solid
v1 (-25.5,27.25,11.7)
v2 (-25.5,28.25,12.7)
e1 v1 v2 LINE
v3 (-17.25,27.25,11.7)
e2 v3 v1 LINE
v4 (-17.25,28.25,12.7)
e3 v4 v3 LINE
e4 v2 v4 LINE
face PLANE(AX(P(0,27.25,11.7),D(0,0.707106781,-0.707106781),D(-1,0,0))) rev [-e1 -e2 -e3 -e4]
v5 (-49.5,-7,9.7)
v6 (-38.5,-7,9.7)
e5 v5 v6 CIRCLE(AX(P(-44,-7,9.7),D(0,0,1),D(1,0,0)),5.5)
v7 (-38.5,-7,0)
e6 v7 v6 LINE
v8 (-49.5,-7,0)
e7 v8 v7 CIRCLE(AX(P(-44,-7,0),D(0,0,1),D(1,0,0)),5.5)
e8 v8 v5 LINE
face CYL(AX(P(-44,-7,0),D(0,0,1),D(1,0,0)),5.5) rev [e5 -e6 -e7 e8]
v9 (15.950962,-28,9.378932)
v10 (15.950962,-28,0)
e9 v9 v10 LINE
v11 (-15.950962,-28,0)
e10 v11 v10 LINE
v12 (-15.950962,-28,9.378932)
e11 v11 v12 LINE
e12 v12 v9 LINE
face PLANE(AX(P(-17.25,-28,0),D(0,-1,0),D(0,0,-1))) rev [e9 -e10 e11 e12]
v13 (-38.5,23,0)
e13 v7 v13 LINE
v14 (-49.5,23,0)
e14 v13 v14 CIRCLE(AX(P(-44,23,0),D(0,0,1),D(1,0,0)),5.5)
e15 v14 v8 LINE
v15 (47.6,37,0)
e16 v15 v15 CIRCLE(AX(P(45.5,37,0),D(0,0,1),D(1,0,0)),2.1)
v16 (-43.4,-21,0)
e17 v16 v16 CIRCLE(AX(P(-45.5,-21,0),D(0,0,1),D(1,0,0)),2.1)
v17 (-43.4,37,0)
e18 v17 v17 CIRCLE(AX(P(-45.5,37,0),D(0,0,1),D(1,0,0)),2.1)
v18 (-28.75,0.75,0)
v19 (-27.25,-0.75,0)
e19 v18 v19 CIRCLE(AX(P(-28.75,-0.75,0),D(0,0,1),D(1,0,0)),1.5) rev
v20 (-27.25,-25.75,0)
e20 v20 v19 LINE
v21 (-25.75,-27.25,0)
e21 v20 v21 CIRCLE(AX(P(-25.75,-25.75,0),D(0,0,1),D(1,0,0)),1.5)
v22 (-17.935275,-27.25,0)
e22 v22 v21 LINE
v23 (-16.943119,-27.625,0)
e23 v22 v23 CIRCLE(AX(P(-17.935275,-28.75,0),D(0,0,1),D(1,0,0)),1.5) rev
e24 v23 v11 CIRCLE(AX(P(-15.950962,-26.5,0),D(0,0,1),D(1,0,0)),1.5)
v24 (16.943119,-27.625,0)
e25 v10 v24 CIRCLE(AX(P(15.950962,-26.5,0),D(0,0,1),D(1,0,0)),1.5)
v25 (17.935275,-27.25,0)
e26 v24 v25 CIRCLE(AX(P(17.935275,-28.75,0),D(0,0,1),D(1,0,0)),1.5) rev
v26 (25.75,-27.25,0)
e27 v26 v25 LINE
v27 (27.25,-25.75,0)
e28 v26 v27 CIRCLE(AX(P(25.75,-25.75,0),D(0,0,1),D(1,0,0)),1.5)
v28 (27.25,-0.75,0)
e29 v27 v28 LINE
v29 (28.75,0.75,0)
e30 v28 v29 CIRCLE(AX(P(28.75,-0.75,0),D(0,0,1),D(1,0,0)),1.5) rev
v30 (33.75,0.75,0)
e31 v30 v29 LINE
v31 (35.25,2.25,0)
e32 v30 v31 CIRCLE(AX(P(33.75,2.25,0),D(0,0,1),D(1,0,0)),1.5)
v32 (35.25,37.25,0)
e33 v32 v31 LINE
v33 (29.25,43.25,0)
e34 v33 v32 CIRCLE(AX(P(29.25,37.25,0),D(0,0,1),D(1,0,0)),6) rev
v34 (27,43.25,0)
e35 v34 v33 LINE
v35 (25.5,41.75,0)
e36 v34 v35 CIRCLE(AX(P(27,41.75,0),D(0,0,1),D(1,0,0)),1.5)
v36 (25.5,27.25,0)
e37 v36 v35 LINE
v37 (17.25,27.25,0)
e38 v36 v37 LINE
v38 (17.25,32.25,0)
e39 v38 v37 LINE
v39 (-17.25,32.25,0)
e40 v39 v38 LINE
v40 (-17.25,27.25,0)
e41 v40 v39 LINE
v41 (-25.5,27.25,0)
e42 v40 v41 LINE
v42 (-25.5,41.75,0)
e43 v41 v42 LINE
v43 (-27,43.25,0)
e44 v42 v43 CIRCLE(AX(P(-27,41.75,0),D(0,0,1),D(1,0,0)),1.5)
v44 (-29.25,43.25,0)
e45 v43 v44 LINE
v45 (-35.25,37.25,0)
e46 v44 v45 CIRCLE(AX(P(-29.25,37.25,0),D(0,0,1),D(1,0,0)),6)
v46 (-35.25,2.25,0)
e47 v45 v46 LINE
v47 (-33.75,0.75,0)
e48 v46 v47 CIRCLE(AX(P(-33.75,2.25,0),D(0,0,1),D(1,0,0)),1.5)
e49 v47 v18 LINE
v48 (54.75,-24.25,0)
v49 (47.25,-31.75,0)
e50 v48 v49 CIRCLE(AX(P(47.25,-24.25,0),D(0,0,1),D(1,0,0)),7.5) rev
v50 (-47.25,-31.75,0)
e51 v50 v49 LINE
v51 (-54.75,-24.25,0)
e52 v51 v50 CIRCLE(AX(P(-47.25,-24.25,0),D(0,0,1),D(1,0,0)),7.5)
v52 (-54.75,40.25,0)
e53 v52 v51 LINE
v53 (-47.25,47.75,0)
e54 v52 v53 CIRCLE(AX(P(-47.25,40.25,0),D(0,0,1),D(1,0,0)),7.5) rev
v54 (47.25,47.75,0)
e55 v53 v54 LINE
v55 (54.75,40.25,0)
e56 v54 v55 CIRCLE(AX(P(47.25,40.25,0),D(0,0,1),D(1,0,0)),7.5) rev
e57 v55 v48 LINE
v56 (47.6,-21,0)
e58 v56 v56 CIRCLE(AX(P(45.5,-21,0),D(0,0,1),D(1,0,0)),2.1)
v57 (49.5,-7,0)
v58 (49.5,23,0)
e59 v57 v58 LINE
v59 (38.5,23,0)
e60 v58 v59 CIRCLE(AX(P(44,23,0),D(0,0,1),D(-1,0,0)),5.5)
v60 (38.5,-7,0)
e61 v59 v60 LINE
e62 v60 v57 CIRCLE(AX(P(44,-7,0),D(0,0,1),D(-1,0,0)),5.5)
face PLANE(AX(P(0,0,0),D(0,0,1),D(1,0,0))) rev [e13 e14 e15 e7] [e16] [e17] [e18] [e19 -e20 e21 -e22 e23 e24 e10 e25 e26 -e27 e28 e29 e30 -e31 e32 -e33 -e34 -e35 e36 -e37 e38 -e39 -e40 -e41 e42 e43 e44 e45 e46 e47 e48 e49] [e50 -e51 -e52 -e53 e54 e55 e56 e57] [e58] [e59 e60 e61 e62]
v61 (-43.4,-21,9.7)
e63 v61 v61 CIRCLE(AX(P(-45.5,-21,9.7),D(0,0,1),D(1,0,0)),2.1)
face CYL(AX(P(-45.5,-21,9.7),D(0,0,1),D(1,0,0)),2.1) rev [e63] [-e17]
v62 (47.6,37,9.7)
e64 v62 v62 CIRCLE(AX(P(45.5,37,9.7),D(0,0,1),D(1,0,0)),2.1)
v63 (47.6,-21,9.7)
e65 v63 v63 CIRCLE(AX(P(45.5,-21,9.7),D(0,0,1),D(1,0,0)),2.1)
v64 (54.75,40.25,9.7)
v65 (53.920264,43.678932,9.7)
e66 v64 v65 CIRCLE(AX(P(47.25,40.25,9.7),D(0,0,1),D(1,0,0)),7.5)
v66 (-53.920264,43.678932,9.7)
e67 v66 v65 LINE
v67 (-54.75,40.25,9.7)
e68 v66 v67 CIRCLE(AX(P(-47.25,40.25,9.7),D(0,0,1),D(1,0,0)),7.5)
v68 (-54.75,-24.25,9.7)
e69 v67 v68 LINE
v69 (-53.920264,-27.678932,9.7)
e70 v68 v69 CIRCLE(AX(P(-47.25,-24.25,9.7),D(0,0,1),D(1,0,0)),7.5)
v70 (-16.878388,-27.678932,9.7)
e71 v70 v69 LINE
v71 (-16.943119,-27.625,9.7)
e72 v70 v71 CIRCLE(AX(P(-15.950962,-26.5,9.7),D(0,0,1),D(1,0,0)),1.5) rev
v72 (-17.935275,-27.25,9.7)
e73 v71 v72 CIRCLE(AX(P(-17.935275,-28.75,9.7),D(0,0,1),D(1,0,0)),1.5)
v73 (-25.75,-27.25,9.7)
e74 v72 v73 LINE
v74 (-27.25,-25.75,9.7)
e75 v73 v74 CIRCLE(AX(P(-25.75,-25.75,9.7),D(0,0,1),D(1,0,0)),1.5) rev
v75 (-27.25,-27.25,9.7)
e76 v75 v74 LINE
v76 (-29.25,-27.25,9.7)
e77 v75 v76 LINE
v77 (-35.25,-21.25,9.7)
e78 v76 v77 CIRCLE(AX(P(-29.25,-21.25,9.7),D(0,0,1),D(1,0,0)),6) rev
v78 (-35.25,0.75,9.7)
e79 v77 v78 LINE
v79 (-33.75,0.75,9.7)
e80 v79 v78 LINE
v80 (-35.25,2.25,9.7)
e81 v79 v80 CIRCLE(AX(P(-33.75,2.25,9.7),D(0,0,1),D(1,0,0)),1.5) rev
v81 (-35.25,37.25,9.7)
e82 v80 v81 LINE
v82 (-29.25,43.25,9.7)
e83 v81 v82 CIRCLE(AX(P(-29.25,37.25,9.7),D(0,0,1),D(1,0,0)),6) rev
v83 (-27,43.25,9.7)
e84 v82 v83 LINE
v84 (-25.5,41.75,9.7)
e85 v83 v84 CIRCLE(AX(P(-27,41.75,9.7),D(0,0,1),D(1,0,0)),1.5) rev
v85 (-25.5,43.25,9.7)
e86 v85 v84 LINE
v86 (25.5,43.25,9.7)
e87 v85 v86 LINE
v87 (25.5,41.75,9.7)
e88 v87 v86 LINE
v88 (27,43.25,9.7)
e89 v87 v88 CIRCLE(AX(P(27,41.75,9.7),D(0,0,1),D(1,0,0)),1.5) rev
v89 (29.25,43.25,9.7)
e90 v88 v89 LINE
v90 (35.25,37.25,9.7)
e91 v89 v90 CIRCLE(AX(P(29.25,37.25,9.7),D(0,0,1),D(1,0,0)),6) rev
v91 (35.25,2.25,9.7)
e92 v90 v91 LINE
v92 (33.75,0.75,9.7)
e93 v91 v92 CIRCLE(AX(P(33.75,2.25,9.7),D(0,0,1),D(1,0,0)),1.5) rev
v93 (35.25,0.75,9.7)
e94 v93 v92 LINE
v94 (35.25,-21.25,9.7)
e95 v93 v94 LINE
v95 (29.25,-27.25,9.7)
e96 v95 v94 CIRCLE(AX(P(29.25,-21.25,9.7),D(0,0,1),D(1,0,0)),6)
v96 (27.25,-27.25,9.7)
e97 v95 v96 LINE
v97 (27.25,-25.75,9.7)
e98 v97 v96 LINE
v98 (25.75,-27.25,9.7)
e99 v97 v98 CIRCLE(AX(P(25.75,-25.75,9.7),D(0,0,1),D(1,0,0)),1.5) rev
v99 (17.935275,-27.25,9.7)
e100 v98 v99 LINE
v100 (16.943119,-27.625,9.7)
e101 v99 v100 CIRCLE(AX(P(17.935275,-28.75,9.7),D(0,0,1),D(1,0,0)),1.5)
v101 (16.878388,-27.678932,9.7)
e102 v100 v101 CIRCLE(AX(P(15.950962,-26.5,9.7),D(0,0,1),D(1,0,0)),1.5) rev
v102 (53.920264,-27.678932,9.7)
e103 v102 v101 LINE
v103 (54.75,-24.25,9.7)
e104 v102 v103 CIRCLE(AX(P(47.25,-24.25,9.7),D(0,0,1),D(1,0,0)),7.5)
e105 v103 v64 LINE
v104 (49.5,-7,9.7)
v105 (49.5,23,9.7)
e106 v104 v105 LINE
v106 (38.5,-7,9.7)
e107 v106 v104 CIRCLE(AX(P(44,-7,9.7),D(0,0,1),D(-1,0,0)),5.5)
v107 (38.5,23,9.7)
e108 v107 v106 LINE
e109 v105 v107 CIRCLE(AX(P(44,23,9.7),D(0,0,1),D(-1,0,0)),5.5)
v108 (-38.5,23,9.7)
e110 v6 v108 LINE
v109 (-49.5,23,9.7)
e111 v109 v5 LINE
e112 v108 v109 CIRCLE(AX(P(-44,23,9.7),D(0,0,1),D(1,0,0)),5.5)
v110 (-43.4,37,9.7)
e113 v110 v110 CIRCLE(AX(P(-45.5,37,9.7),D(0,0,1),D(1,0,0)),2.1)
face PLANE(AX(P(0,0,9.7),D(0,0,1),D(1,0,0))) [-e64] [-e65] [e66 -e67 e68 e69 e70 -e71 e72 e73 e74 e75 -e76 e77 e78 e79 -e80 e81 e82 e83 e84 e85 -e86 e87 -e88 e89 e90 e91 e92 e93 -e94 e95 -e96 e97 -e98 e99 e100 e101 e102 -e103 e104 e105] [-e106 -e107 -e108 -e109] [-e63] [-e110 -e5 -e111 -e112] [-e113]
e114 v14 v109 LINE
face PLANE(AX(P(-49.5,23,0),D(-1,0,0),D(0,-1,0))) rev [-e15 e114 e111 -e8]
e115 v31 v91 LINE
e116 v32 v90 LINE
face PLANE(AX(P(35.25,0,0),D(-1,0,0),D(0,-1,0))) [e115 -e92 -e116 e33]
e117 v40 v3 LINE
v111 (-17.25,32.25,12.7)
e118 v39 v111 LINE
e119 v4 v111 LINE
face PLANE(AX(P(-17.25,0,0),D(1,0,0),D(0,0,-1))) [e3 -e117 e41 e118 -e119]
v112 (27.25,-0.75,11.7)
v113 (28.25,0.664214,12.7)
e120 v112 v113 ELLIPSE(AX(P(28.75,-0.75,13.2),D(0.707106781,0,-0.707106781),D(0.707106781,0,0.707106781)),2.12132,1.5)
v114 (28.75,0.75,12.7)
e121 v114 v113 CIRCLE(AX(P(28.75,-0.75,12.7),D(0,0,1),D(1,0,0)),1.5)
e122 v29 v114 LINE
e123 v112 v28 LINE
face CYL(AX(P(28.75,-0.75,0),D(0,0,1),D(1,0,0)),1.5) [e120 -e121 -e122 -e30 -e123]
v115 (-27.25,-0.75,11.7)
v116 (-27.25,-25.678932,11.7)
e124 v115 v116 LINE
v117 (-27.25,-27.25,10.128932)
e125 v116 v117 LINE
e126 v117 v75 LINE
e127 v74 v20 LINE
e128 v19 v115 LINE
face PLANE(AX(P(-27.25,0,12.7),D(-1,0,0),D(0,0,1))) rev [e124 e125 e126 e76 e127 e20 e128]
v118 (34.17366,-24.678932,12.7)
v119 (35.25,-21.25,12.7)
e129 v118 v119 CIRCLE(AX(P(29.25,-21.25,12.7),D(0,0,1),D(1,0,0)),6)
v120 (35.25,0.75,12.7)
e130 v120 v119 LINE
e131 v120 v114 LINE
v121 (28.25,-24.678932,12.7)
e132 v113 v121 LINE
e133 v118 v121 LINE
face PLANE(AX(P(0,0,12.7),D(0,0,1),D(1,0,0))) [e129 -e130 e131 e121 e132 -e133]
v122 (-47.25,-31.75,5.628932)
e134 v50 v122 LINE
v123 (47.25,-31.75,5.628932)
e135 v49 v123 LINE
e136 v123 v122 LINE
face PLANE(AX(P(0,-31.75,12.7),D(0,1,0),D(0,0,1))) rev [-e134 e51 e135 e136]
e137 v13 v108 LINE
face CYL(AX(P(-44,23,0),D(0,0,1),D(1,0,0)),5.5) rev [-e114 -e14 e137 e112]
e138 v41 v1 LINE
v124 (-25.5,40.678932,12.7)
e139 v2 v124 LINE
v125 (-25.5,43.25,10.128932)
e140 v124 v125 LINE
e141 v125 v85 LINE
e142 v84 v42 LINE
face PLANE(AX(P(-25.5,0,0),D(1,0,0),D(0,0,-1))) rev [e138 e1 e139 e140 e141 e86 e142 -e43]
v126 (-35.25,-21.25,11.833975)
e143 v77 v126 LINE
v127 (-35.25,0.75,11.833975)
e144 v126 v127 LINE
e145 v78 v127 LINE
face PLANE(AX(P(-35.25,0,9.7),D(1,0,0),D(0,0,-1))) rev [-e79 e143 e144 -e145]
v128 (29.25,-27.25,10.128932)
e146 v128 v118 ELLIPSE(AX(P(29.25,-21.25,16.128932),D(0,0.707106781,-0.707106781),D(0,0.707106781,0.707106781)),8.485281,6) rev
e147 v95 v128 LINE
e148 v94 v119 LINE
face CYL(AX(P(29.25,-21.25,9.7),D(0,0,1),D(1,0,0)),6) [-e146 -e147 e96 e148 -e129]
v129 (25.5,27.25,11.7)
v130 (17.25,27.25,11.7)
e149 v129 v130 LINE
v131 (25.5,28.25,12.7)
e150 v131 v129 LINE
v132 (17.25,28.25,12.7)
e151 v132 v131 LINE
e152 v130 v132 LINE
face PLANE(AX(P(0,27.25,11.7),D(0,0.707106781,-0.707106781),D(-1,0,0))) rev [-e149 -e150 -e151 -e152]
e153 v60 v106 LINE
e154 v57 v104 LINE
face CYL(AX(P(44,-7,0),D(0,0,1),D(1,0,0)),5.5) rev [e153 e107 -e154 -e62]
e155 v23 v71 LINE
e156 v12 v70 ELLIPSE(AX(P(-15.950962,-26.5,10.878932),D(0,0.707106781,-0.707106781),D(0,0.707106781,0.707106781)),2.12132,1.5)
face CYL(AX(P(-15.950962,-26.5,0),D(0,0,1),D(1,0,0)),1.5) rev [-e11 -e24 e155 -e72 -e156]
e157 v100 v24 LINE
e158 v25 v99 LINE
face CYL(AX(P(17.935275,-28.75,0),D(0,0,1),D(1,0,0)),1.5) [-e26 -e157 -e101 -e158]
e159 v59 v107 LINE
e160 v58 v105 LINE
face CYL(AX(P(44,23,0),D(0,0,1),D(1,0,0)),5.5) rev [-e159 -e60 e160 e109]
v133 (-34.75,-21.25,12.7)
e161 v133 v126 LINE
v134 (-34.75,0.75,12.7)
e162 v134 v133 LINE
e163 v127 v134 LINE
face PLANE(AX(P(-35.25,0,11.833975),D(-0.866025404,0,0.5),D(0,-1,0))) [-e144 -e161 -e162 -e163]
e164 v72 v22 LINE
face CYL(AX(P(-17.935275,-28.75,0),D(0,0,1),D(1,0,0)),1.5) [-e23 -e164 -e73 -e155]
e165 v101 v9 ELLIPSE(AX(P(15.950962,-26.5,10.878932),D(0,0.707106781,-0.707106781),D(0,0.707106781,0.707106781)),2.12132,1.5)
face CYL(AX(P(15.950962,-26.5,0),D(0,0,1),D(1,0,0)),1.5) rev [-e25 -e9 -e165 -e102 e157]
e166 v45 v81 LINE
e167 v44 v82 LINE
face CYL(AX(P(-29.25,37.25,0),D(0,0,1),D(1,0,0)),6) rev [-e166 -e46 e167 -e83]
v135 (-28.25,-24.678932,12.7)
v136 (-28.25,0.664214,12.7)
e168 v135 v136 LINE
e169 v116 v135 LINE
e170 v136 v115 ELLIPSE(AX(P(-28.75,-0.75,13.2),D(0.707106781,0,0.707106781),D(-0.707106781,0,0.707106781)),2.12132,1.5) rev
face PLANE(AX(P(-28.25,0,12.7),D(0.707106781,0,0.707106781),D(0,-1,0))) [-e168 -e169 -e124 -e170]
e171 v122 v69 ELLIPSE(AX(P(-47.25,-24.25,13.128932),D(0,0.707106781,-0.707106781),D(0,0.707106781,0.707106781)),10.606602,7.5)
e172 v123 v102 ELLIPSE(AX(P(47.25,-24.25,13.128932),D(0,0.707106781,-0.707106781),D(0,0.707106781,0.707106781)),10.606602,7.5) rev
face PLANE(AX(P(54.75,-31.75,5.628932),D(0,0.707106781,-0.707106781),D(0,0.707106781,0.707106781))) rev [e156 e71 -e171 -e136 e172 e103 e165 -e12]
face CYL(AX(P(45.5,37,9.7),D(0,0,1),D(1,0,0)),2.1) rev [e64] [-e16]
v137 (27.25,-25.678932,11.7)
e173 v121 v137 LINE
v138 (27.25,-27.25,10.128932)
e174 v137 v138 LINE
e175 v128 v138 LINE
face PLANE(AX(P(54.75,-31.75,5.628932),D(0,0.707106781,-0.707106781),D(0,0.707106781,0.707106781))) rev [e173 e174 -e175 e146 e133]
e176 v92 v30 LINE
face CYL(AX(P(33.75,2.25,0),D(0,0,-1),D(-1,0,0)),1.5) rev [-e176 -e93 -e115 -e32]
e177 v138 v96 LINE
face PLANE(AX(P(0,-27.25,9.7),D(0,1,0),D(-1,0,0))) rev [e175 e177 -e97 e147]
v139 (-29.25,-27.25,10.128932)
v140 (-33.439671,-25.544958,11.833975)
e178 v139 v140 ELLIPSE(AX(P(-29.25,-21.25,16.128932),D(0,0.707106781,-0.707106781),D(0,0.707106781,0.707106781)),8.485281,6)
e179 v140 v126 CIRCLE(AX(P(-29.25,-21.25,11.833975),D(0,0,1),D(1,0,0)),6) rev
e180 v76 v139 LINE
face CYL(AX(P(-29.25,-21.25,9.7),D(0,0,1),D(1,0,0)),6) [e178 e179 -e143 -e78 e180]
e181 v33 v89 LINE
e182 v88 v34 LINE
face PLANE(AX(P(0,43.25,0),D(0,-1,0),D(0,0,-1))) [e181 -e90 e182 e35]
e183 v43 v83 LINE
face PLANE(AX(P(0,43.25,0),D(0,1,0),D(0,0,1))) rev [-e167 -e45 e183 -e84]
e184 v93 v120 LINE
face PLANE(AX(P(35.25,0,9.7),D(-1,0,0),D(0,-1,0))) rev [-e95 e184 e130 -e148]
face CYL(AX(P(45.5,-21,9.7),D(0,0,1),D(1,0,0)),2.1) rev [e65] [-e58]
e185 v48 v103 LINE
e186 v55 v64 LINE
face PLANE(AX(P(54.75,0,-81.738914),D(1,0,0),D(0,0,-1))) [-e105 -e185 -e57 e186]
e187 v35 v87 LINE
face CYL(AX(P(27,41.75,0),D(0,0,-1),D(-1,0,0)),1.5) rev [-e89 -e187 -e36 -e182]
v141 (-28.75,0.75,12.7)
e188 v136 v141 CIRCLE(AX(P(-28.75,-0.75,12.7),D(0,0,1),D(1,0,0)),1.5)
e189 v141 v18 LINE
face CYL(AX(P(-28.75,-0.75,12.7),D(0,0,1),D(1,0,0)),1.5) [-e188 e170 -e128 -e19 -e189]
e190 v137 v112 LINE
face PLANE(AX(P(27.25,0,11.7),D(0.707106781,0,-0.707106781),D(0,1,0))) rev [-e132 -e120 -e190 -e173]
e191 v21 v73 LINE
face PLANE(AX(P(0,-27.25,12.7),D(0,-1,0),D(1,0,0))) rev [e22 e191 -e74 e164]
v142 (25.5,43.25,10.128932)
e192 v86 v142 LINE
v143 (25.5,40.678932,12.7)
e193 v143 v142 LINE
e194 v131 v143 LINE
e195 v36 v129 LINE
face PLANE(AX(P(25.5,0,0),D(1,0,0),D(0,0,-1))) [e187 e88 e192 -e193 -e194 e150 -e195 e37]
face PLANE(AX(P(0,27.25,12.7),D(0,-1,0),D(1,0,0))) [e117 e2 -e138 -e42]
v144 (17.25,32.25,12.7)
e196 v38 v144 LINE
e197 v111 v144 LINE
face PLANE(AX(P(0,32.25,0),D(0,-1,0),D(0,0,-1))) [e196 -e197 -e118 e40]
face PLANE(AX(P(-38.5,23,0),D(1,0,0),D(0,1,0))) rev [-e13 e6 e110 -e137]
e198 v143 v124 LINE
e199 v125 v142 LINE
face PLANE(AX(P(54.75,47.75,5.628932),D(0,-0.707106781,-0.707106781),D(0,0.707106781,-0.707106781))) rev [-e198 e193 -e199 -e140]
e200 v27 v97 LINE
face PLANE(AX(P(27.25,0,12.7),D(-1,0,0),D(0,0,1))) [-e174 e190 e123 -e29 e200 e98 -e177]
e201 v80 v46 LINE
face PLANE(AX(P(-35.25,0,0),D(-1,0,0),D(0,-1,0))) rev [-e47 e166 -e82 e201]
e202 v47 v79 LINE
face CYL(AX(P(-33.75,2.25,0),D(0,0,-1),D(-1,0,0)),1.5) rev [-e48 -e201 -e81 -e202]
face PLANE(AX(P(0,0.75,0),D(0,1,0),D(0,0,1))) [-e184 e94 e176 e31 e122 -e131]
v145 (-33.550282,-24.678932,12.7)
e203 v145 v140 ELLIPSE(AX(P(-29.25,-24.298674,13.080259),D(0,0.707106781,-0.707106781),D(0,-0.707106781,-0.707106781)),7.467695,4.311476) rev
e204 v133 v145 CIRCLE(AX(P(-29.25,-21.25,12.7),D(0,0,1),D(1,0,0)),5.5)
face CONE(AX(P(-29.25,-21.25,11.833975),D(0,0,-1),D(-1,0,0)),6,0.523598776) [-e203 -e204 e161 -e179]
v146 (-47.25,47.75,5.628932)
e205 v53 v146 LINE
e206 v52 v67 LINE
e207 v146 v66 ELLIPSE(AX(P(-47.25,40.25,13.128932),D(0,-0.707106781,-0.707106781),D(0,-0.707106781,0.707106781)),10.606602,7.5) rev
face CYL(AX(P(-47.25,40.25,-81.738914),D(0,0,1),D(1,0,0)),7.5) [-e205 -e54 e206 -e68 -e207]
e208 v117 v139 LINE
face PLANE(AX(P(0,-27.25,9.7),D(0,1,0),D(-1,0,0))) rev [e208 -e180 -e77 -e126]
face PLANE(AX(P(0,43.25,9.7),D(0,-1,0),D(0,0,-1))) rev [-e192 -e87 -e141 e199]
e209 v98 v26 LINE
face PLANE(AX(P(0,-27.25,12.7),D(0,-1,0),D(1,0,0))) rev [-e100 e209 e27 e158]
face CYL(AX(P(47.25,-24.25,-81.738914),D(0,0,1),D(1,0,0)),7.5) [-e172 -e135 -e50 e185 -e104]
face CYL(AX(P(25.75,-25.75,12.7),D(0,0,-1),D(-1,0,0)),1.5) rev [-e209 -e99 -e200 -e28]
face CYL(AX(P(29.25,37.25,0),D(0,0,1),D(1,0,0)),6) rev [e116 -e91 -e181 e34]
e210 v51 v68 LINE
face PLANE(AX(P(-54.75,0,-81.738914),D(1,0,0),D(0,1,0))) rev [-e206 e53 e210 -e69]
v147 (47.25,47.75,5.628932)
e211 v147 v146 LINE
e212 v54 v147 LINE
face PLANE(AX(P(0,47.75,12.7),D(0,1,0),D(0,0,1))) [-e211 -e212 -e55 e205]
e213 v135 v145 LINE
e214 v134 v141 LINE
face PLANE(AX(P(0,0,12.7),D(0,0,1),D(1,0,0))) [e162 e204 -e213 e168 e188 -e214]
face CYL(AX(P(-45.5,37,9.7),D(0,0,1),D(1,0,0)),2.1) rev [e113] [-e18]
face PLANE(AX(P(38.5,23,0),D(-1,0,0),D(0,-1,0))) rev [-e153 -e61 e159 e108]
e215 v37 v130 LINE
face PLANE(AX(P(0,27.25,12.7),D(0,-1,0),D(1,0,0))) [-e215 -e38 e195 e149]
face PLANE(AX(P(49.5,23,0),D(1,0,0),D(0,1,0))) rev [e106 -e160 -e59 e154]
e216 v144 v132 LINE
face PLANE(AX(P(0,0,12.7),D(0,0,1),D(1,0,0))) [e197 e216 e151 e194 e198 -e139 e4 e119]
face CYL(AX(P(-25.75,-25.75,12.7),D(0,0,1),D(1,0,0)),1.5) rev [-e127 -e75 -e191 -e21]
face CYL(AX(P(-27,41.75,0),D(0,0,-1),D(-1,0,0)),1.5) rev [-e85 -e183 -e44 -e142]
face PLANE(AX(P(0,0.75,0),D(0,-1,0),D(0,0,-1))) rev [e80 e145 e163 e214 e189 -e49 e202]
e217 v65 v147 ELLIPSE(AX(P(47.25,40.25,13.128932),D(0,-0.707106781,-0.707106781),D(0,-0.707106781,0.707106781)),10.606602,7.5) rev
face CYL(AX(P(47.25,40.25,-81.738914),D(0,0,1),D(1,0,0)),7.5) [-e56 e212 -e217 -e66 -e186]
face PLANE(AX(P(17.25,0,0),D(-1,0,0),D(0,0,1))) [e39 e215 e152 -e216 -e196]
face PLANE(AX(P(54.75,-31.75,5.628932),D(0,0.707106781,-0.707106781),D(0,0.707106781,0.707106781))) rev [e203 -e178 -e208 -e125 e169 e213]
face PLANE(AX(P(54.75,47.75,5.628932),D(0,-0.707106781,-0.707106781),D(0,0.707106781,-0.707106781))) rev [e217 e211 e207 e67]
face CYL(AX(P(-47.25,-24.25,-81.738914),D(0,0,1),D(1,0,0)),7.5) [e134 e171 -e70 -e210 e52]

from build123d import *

# Parameters (mm, degrees)
SKETCH1_W                   = 79.5
SKETCH1_H                   = 79.5
SKETCH1_W_2                 = 54.5
SKETCH1_H_2                 = 54.5
BOSS_EXTRUDE1_DEPTH         = 12.7
CHAMFER2_SIZE               = 4
SKETCH2_W                   = 34.5
SKETCH2_H                   = 5
SKETCH2_H_2                 = 0.75
CUT_EXTRUDE1_DEPTH          = 64.41462765
BOSS_EXTRUDE2_DEPTH         = 12.7
CUT_EXTRUDE2_DEPTH          = 3
CUT_EXTRUDE3_DEPTH          = 121.131604917
CHAMFER5_SIZE               = 0.5
CHAMFER5_SIZE2              = 0.866025404
TAP_DRILL_FOR_M5X0_8_TAP3_D = 4.2
CUT_EXTRUDE4_DEPTH          = 74.291984555
FILLET1_R                   = 1.5
FILLET2_R                   = 1.5
FILLET3_R                   = 1.5
CHAMFER4_SIZE               = 1


with BuildPart() as part:
    # Sketch1 → Boss-Extrude1 (new body)
    with BuildSketch(Plane.XY):
        with Locations((0, 8)):
            Rectangle(SKETCH1_W, SKETCH1_H)
        Rectangle(SKETCH1_W_2, SKETCH1_H_2, mode=Mode.SUBTRACT)
    extrude(amount=BOSS_EXTRUDE1_DEPTH)

    # Chamfer2
    chamfer2_edges = [part.edges().sort_by_distance(p)[0] for p in [
        (39.75, -31.75, 6.35),
        (-39.75, -31.75, 6.35),
        (-39.75, 47.75, 6.35),
        (39.75, 47.75, 6.35),
    ]]
    chamfer(chamfer2_edges, length=CHAMFER2_SIZE)

    # Sketch2 → Cut-Extrude1 (cut, through all)
    with BuildSketch(Plane.XY.offset(12.7)):
        with BuildLine():
            Line((-27.25, 27.25), (-25.5, 27.25))
            Line((-25.5, 27.25), (-25.5, 43.25))
            Line((-25.5, 43.25), (-29.25, 43.25))
            ThreePointArc((-29.25, 43.25), (-33.492640687, 41.492640687), (-35.25, 37.25))
            Line((-35.25, 37.25), (-35.25, 0.75))
            Line((-35.25, 0.75), (-27.25, 0.75))
            Line((-27.25, 0.75), (-27.25, 27.25))
        make_face()
        with Locations((0, 29.75)):
            Rectangle(SKETCH2_W, SKETCH2_H)
        with BuildLine():
            Line((25.5, 43.25), (25.5, 27.25))
            Line((25.5, 27.25), (27.25, 27.25))
            Line((27.25, 27.25), (27.25, 0.75))
            Line((27.25, 0.75), (35.25, 0.75))
            Line((35.25, 0.75), (35.25, 37.25))
            ThreePointArc((35.25, 37.25), (33.492640687, 41.492640687), (29.25, 43.25))
            Line((29.25, 43.25), (25.5, 43.25))
        make_face()
        with Locations((0, -27.625)):
            Rectangle(SKETCH2_W, SKETCH2_H_2)
    extrude(amount=-CUT_EXTRUDE1_DEPTH, mode=Mode.SUBTRACT)

    # Sketch5 → Boss-Extrude2 (add)
    with BuildSketch(Plane.XY.offset(12.7)):
        with BuildLine():
            Line((-47.25, -31.75), (-35.75, -31.75))
            Line((-35.75, -31.75), (-39.75, -27.75))
            Line((-39.75, -27.75), (-39.75, 43.75))
            Line((-39.75, 43.75), (-35.75, 47.75))
            Line((-35.75, 47.75), (-47.25, 47.75))
            ThreePointArc((-47.25, 47.75), (-52.553300859, 45.553300859), (-54.75, 40.25))
            Line((-54.75, 40.25), (-54.75, -24.25))
            ThreePointArc((-54.75, -24.25), (-52.553300859, -29.553300859), (-47.25, -31.75))
        make_face()
        with BuildLine():
            Line((35.75, -31.75), (47.25, -31.75))
            ThreePointArc((47.25, -31.75), (52.553300859, -29.553300859), (54.75, -24.25))
            Line((54.75, -24.25), (54.75, 40.25))
            ThreePointArc((54.75, 40.25), (52.553300859, 45.553300859), (47.25, 47.75))
            Line((47.25, 47.75), (35.75, 47.75))
            Line((35.75, 47.75), (39.75, 43.75))
            Line((39.75, 43.75), (39.75, -27.75))
            Line((39.75, -27.75), (35.75, -31.75))
        make_face()
    extrude(amount=-BOSS_EXTRUDE2_DEPTH)

    # Sketch7 → Cut-Extrude2 (cut)
    with BuildSketch(Plane.XY.offset(12.7)):
        with BuildLine():
            ThreePointArc((54.75, 40.25), (52.553300859, 45.553300859), (47.25, 47.75))
            Line((47.25, 47.75), (-47.25, 47.75))
            ThreePointArc((-47.25, 47.75), (-52.553300859, 45.553300859), (-54.75, 40.25))
            Line((-54.75, 40.25), (-54.75, -24.25))
            ThreePointArc((-54.75, -24.25), (-52.553300859, -29.553300859), (-47.25, -31.75))
            Line((-47.25, -31.75), (47.25, -31.75))
            ThreePointArc((47.25, -31.75), (52.553300859, -29.553300859), (54.75, -24.25))
            Line((54.75, -24.25), (54.75, 40.25))
        make_face()
        with BuildLine():
            ThreePointArc((35.25, -21.25), (33.492640687, -25.492640687), (29.25, -27.25))
            Line((29.25, -27.25), (27.25, -27.25))
            Line((27.25, -27.25), (17.25, -27.25))
            Line((17.25, -27.25), (17.25, -28))
            Line((17.25, -28), (-17.25, -28))
            Line((-17.25, -28), (-17.25, -27.25))
            Line((-17.25, -27.25), (-27.25, -27.25))
            Line((-27.25, -27.25), (-29.25, -27.25))
            ThreePointArc((-29.25, -27.25), (-33.492640687, -25.492640687), (-35.25, -21.25))
            Line((-35.25, -21.25), (-35.25, 0.75))
            Line((-35.25, 0.75), (-35.25, 37.25))
            ThreePointArc((-35.25, 37.25), (-33.492640687, 41.492640687), (-29.25, 43.25))
            Line((-29.25, 43.25), (-25.5, 43.25))
            Line((-25.5, 43.25), (25.5, 43.25))
            Line((25.5, 43.25), (29.25, 43.25))
            ThreePointArc((29.25, 43.25), (33.492640687, 41.492640687), (35.25, 37.25))
            Line((35.25, 37.25), (35.25, 0.75))
            Line((35.25, 0.75), (35.25, -21.25))
        make_face(mode=Mode.SUBTRACT)
    extrude(amount=-CUT_EXTRUDE2_DEPTH, mode=Mode.SUBTRACT)

    # Sketch8 → Cut-Extrude3 (cut, through all)
    with BuildSketch(Plane.ZY.offset(54.75)):
        Polygon((5.628932188, -31.75), (12.7, -24.678932188), (12.7, -31.75), align=None)
        Polygon((12.7, 47.75), (5.628932188, 47.75), (12.7, 40.678932188), align=None)
    extrude(amount=-CUT_EXTRUDE3_DEPTH, mode=Mode.SUBTRACT)

    # Chamfer5
    chamfer5_edges = [part.edges().sort_by_distance(p)[0] for p in [
        (-35.25, -10.25, 12.7),
        (-34.974594209, -23.046947729, 12.7),
    ]]
    chamfer5_side = [part.faces().sort_by_distance(p)[0] for p in [
        (-31.22846957, -11.895050932, 12.7),
    ]]
    chamfer(chamfer5_edges, length=CHAMFER5_SIZE, length2=CHAMFER5_SIZE2, reference=chamfer5_side[0])

    # Tap Drill for M5x0.8 Tap3 (through all)
    with Locations(Plane.XY.offset(9.7)):
        with Locations((-45.5, 37), (-45.5, -21), (45.5, -21), (45.5, 37)):
            Hole(TAP_DRILL_FOR_M5X0_8_TAP3_D / 2)

    # Sketch11 → Cut-Extrude4 (cut, through all)
    with BuildSketch(Plane.XY.offset(9.7)):
        with BuildLine():
            Line((-38.5, 23), (-38.5, -7))
            ThreePointArc((-38.5, -7), (-44, -12.5), (-49.5, -7))
            Line((-49.5, -7), (-49.5, 23))
            ThreePointArc((-49.5, 23), (-44, 28.5), (-38.5, 23))
        make_face()
        with BuildLine():
            Line((38.5, 23), (38.5, -7))
            ThreePointArc((38.5, -7), (44, -12.5), (49.5, -7))
            Line((49.5, -7), (49.5, 23))
            ThreePointArc((49.5, 23), (44, 28.5), (38.5, 23))
        make_face()
    extrude(amount=-CUT_EXTRUDE4_DEPTH, mode=Mode.SUBTRACT)

    # Fillet1
    fillet1_edges = [part.edges().sort_by_distance(p)[0] for p in [
        (-27.25, -27.25, 4.85),
        (27.25, -27.25, 4.85),
        (-25.5, 43.25, 4.85),
        (-27.25, 0.75, 6.35),
        (-35.25, 0.75, 4.85),
        (35.25, 0.75, 4.85),
        (27.25, 0.75, 6.35),
        (25.5, 43.25, 4.85),
    ]]
    fillet(fillet1_edges, radius=FILLET1_R)

    # Fillet2
    # the kernel refuses this fillet: 1.5 mm, written as the material it adds along each edge
    with BuildSketch(Plane(origin=(17.25, -28, 12.626527452), x_dir=(0, 1, 0), z_dir=(0, 0, -1))) as fillet2_piece_1_section:
        with BuildLine():
            CenterArc((1.5, -1.299038106), FILLET2_R, 120, 60)
            Line((0, -1.299038106), (-0.03, -1.299038106))
            Line((-0.03, -1.299038106), (-0.03, 0))
            Line((-0.03, 0), (0, 0.03))
            ThreePointArc((0, 0.03), (0.375, 0.03), (0.735, 0.025980762))
            Line((0.735, 0.025980762), (0.75, 0))
        make_face()
    fillet2_piece_1 = extrude(amount=12.626527452, mode=Mode.PRIVATE)
    fillet2_piece_1 = split(fillet2_piece_1, bisect_by=Plane(origin=(16.927844244, -27.803524046, 9.7), z_dir=(0, 0, -1)), keep=Keep.TOP, mode=Mode.PRIVATE)
    fillet2_piece_1 = split(fillet2_piece_1, bisect_by=Plane(origin=(16.927844244, -30.206033858, 7.17289833), z_dir=(0, 0.7071067811865475, -0.7071067811865477)), keep=Keep.TOP, mode=Mode.PRIVATE)
    add(fillet2_piece_1)
    with BuildSketch(Plane(origin=(-17.25, -28, 12.626527452), x_dir=(1, 0, 0), z_dir=(0, 0, -1))) as fillet2_piece_2_section:
        with BuildLine():
            CenterArc((1.299038106, -1.5), FILLET2_R, 90, 60)
            Line((0, -0.75), (-0.025980762, -0.735))
            ThreePointArc((-0.025980762, -0.735), (-0.03, -0.375), (-0.03, 0))
            Line((-0.03, 0), (0, 0.03))
            Line((0, 0.03), (1.299038106, 0.03))
            Line((1.299038106, 0.03), (1.299038106, 0))
        make_face()
    fillet2_piece_2 = extrude(amount=12.626527452, mode=Mode.PRIVATE)
    fillet2_piece_2 = split(fillet2_piece_2, bisect_by=Plane(origin=(-16.927844244, -27.803524046, 9.7), z_dir=(0, 0, -1)), keep=Keep.TOP, mode=Mode.PRIVATE)
    fillet2_piece_2 = split(fillet2_piece_2, bisect_by=Plane(origin=(-16.927844244, -30.206033859, 7.172898329), z_dir=(0, 0.7071067811865475, -0.7071067811865477)), keep=Keep.TOP, mode=Mode.PRIVATE)
    add(fillet2_piece_2)

    # Fillet3
    fillet3_edges = [part.edges().sort_by_distance(p)[0] for p in [
        (-17.25, -27.25, 4.85),
        (17.25, -27.25, 4.85),
    ]]
    fillet(fillet3_edges, radius=FILLET3_R)

    # Chamfer4
    # the kernel refuses this chamfer: 1 mm, written as the material it takes off along each edge
    with BuildSketch(Plane(origin=(-27.25, -27.250615176, 12.7), x_dir=(0.027495876610585647, 0, -0.9996219169112968), z_dir=(0, 1, 0)), Plane(origin=(27.25, 1.821682988, 12.7), x_dir=(-0.027495876610585647, 0, -0.9996219169112968), z_dir=(0, -1, 0))) as chamfer4_piece_1:
        Polygon((CHAMFER4_SIZE * 0.999621916911, CHAMFER4_SIZE * 0.0274958766106), (-CHAMFER4_SIZE * 0.0274958766106, CHAMFER4_SIZE * 0.999621916911), (0, 0), align=None)
    extrude(amount=29.072298164, mode=Mode.SUBTRACT)
    with BuildSketch(Plane(origin=(-28.071682988, 27.25, 12.7), x_dir=(0, -0.027495876610585647, -0.9996219169112968), z_dir=(1, 0, 0))) as chamfer4_piece_2:
        Polygon((CHAMFER4_SIZE * 0.999621916911, CHAMFER4_SIZE * 0.0274958766106), (-CHAMFER4_SIZE * 0.0274958766106, CHAMFER4_SIZE * 0.999621916911), (0, 0), align=None)
    extrude(amount=13.393365976, mode=Mode.SUBTRACT)
    with BuildSketch(Plane(origin=(14.678317012, 27.25, 12.7), x_dir=(0, 0.9996219169112968, 0.027495876610585647), z_dir=(1, 0, 0))) as chamfer4_piece_3:
        Polygon((CHAMFER4_SIZE * 0.999621916911, -CHAMFER4_SIZE * 0.0274958766106), (-CHAMFER4_SIZE * 0.0274958766106, -CHAMFER4_SIZE * 0.999621916911), (0, 0), align=None)
    extrude(amount=13.393365976, mode=Mode.SUBTRACT)


solid = part.part
